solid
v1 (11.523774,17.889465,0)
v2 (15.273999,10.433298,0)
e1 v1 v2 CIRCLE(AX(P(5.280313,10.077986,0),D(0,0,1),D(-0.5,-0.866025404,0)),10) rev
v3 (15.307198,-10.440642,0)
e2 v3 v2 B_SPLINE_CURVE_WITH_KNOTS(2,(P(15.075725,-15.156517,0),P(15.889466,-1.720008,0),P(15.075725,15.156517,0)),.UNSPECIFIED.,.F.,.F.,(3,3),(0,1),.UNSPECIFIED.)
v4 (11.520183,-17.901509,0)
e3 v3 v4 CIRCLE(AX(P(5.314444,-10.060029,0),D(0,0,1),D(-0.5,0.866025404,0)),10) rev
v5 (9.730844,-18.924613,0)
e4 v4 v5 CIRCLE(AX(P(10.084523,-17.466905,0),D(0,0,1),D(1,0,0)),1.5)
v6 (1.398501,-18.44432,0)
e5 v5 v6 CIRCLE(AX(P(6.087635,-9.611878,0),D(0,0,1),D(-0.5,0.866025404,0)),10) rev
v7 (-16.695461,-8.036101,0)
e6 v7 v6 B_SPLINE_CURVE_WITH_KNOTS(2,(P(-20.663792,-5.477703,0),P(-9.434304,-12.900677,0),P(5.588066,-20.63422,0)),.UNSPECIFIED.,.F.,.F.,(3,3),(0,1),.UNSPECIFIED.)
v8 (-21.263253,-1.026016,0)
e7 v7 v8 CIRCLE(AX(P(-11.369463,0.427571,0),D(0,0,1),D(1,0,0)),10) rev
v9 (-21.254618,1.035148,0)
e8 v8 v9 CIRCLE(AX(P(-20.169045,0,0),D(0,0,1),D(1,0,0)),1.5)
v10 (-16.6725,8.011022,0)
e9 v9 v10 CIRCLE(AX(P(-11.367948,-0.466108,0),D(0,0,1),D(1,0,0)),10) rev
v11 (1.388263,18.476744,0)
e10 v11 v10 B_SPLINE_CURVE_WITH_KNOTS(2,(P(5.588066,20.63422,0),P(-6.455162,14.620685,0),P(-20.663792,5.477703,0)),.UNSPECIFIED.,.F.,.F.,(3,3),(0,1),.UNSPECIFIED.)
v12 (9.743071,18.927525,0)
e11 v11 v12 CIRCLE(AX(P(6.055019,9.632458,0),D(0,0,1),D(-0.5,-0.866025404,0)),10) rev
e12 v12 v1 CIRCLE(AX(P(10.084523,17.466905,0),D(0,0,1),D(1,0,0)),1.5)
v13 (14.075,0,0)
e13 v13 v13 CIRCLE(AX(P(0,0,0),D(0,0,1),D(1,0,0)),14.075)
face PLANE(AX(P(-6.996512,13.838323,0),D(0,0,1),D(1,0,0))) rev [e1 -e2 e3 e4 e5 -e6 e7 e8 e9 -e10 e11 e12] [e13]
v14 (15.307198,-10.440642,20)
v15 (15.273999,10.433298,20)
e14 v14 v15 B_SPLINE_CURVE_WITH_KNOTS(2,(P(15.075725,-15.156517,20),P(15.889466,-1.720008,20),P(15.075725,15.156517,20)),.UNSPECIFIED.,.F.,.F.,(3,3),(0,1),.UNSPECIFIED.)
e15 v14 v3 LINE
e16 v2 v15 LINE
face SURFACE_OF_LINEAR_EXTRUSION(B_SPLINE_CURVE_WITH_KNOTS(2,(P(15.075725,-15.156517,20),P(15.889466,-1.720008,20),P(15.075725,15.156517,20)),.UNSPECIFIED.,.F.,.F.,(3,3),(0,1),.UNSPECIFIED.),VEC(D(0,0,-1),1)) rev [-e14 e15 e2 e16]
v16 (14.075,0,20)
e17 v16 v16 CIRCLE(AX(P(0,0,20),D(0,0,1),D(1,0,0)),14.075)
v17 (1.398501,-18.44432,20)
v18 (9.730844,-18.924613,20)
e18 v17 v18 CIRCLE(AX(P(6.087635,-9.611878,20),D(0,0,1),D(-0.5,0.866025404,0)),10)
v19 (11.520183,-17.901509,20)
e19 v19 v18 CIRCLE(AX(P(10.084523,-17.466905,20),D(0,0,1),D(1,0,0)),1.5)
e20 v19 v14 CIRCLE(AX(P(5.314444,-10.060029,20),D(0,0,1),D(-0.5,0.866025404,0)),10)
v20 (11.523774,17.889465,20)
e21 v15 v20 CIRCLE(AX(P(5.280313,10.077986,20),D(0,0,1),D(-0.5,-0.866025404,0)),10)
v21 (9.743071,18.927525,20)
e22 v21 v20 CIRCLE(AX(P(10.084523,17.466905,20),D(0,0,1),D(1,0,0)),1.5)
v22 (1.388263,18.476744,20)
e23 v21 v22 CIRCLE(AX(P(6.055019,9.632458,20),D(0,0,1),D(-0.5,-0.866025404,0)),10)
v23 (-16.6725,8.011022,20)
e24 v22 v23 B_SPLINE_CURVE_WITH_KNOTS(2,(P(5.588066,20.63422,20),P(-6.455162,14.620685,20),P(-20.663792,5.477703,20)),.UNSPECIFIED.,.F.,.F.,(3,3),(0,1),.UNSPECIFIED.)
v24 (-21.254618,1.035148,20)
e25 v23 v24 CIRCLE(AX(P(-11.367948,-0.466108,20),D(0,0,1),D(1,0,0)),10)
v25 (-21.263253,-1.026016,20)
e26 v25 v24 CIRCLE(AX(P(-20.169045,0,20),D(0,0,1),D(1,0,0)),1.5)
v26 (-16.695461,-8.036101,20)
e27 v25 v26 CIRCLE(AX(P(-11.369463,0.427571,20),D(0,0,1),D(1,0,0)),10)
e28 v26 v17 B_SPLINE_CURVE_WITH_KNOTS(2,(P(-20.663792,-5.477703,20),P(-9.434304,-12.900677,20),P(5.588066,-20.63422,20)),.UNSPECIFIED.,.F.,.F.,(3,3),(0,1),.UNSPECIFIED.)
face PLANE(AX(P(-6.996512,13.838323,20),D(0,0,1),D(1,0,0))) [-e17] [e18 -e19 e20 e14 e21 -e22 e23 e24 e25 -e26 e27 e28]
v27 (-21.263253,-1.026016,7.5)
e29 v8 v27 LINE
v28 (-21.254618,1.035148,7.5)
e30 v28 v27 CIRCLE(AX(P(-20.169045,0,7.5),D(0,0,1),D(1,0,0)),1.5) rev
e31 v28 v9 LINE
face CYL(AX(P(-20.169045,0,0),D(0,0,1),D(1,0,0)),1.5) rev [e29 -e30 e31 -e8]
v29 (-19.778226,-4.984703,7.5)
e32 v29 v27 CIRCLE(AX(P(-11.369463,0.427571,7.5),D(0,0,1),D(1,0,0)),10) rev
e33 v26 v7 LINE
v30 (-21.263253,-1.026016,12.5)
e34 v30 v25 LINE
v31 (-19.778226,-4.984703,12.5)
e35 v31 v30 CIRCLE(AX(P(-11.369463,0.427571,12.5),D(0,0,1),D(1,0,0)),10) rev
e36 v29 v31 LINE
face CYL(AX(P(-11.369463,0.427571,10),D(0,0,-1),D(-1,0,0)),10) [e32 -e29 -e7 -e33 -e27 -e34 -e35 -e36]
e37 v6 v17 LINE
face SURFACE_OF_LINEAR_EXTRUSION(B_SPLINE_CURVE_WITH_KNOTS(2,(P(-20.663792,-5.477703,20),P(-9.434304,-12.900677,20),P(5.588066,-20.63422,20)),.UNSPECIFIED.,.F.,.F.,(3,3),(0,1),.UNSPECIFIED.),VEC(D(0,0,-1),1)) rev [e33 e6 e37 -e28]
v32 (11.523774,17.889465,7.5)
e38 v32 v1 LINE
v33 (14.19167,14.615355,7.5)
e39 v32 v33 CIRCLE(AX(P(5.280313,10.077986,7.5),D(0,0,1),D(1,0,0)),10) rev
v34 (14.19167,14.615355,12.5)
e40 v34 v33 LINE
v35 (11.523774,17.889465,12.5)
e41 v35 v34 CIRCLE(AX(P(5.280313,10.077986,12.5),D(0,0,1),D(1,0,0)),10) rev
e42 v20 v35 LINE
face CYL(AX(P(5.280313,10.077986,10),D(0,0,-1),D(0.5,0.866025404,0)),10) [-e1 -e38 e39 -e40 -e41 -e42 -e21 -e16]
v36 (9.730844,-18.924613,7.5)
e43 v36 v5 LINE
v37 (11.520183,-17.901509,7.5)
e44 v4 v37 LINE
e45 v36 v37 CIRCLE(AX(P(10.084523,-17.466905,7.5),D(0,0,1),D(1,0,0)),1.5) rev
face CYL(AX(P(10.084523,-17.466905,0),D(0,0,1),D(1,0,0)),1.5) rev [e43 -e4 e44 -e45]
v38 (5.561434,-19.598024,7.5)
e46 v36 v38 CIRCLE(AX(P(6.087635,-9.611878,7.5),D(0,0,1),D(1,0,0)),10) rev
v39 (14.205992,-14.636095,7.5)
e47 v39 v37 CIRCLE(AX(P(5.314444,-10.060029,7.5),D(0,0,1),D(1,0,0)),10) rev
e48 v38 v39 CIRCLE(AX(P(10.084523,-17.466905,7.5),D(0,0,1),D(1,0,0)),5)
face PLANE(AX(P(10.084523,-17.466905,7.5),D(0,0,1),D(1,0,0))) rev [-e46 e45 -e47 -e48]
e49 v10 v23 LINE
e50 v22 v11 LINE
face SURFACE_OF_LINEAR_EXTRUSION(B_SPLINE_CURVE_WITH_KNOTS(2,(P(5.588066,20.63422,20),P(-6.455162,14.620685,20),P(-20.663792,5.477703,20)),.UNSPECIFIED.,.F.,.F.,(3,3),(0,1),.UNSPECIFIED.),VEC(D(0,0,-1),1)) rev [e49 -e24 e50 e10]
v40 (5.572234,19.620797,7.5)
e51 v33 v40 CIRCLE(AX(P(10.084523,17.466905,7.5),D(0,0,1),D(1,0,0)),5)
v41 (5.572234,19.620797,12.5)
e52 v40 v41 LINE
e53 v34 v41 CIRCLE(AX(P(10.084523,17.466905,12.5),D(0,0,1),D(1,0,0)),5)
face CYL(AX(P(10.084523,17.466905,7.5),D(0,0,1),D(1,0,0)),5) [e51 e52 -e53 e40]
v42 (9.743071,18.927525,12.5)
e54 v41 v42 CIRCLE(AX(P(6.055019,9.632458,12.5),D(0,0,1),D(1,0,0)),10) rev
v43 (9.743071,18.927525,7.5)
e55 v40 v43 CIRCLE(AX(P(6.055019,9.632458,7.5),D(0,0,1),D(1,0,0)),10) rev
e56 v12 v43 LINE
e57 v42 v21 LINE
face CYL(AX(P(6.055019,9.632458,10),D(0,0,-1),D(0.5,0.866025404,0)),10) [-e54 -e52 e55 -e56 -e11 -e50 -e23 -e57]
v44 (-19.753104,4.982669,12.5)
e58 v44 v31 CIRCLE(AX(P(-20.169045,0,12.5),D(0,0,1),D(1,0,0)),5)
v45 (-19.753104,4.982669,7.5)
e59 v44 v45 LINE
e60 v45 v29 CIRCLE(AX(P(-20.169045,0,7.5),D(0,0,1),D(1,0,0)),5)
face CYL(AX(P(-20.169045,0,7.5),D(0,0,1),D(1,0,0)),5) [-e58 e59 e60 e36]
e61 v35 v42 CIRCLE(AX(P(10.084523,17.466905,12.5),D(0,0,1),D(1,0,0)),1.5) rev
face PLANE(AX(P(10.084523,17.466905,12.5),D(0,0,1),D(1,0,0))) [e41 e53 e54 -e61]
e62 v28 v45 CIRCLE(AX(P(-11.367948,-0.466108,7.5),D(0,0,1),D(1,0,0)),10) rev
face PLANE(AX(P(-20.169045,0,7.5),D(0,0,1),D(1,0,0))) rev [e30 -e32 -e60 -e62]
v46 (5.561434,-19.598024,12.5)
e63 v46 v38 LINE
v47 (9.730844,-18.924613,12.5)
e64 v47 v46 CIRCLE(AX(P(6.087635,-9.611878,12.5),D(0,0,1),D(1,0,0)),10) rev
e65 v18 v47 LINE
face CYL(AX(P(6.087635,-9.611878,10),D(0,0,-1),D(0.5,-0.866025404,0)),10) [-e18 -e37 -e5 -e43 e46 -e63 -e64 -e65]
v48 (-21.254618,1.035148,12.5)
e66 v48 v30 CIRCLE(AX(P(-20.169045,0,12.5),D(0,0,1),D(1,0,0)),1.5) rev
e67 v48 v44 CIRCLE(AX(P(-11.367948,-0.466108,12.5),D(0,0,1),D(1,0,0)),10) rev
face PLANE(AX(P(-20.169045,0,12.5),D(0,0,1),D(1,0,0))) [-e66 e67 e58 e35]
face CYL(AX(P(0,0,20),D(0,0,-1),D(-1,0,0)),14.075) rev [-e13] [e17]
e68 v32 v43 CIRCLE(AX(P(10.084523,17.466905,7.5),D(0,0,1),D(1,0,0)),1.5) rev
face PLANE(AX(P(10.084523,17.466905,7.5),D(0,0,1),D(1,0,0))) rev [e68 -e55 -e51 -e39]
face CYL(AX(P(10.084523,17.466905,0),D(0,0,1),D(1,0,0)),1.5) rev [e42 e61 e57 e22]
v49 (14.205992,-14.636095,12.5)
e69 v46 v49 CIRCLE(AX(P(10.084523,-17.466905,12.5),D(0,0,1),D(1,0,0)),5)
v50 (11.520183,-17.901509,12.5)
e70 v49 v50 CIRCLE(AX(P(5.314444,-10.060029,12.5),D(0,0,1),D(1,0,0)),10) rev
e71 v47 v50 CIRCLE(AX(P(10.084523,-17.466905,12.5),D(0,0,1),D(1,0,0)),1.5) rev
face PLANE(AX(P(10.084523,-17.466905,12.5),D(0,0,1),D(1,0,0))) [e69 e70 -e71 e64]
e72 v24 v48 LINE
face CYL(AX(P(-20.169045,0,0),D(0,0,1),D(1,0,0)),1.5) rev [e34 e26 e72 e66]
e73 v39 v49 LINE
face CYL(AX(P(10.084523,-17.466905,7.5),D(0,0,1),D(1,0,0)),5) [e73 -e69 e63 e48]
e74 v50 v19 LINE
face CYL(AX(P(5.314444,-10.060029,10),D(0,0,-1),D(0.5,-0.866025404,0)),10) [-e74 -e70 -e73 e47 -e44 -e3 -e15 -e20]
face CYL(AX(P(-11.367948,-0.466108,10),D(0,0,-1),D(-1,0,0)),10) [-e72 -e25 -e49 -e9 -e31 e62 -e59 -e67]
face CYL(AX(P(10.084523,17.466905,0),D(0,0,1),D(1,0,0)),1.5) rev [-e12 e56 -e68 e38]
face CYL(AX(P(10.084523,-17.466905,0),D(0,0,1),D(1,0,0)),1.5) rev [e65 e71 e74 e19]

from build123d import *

# Parameters (mm, degrees)
SKETCH1_R               = 14.075
BOSS_EXTRUDE1_DEPTH     = 20
FILLET2_R               = 10
CIRPATTERN2_DEPTH       = 20
CUT_EXTRUDE1_DEPTH      = 36.236736823
CUT_EXTRUDE1_DEPTH_BACK = 36.236736823
SKETCH2_R               = 1.5
SKETCH3_R               = 5
BOSS_EXTRUDE2_DEPTH     = 2.5


# Read off the part's stored shape, not the designer's step: CirPattern2
with BuildPart() as part:
    # Sketch1 → Boss-Extrude1 (new body)
    with BuildSketch(Plane.XY):
        with BuildLine():
            ThreePointArc((15.07572539, 15.156517087), (10.68875, 18.513458069), (5.588066136, 20.634219712))
            add(Edge.make_bspline(
                [(-20.663791525, 5.477702624), (-6.455161962, 14.620684981), (5.588066136, 20.634219712)],
                knots=[0, 0, 0, 1, 1, 1], degree=2))
            ThreePointArc((-20.663791525, 5.477702624), (-21.3775, 0), (-20.663791525, -5.477702624))
            add(Edge.make_bspline(
                [(5.588066136, -20.634219712), (-9.434303633, -12.900676735), (-20.663791525, -5.477702624)],
                knots=[0, 0, 0, 1, 1, 1], degree=2))
            ThreePointArc((5.588066136, -20.634219712), (10.68875, -18.513458069), (15.07572539, -15.156517087))
            add(Edge.make_bspline(
                [(15.07572539, 15.156517087), (15.889465595, -1.720008246), (15.07572539, -15.156517087)],
                knots=[0, 0, 0, 1, 1, 1], degree=2))
        make_face()
        Circle(SKETCH1_R, mode=Mode.SUBTRACT)
    extrude(amount=BOSS_EXTRUDE1_DEPTH)

    # Fillet2
    # the kernel refuses this fillet: 10 mm, written as the material it takes off along each edge
    with BuildSketch(Plane(origin=(-20.663791525, 5.477702624, 0), x_dir=(0.8442926206452175, 0.535882422480931, 0), z_dir=(0, 0, 1))) as fillet2_piece_1:
        with BuildLine():
            CenterArc((4.663228268, -9.99979423), FILLET2_R, 89.632438943, 60.311708344)
            Line((-3.992147587, -4.991354472), (-4.165255104, -4.891185677))
            ThreePointArc((-4.165255104, -4.891185677), (-2.339855889, -2.220716027), (-0.135758458, 0.146866065))
            Line((-0.135758458, 0.146866065), (-0.001245228, 0.199996123))
            ThreePointArc((-0.001245228, 0.199996123), (2.363679869, 0.207468059), (4.728662356, 0.199995885))
            Line((4.728662356, 0.199995885), (4.727379335, 0))
        make_face()
    extrude(amount=20, mode=Mode.SUBTRACT)
    with BuildSketch(Plane(origin=(-20.663791525, -5.477702624, 0), x_dir=(-0.11054249856240242, 0.9938713981253215, 0), z_dir=(0, 0, 1))) as fillet2_piece_2:
        with BuildLine():
            CenterArc((4.841664479, -9.890151004), FILLET2_R, 81.49970425, 59.972427812)
            Line((-2.981388332, -3.661198868), (-3.137849388, -3.536619825))
            ThreePointArc((-3.137849388, -3.536619825), (-1.656048683, -1.695980181), (-0.153629227, 0.128054913))
            Line((-0.153629227, 0.128054913), (-0.029562903, 0.19780302))
            ThreePointArc((-0.029562903, 0.19780302), (3.159904821, 0.434829692), (6.349372545, 0.19780302))
            Line((6.349372545, 0.19780302), (6.319809642, 0))
        make_face()
    extrude(amount=20, mode=Mode.SUBTRACT)

    # CirPattern2 outline → CirPattern2 (cut)
    with BuildSketch(Plane.XY):
        with BuildLine():
            add(Edge.make_bspline(
                [(5.588066136, 20.634219712), (3.520088132, 19.601618033), (1.388262549, 18.476743556)],
                knots=[0, 0, 0, 0.171712932, 0.171712932, 0.171712932], degree=2))
            ThreePointArc((1.388262549, 18.476743556), (6.013402902, 19.632371585), (10.648001522, 18.515279353))
            ThreePointArc((10.648001522, 18.515279353), (13.959170177, 15.045625026), (15.27399868, 10.43329752))
            add(Edge.make_bspline(
                [(15.27399868, 10.43329752), (15.191267831, 12.760230261), (15.07572539, 15.156517087)],
                knots=[0.858010652, 0.858010652, 0.858010652, 1, 1, 1], degree=2))
            ThreePointArc((15.07572539, 15.156517087), (10.68875, 18.513458069), (5.588066136, 20.634219712))
        make_face()
        with BuildLine():
            add(Edge.make_bspline(
                [(15.07572539, -15.156517087), (15.215455106, -12.849294762), (15.307198024, -10.440642412)],
                knots=[0, 0, 0, 0.171712932, 0.171712932, 0.171712932], degree=2))
            ThreePointArc((15.307198024, -10.440642412), (13.995431078, -15.023945468), (10.710701517, -18.479079494))
            ThreePointArc((10.710701517, -18.479079494), (6.0503084, -19.611808503), (1.398501358, -18.444319635))
            add(Edge.make_bspline(
                [(1.398501358, -18.444319635), (3.455049649, -19.536138988), (5.588066136, -20.634219712)],
                knots=[0.858010652, 0.858010652, 0.858010652, 1, 1, 1], degree=2))
            ThreePointArc((5.588066136, -20.634219712), (10.68875, -18.513458069), (15.07572539, -15.156517087))
        make_face()
    extrude(amount=CIRPATTERN2_DEPTH, mode=Mode.SUBTRACT)

    # Sketch2 → Cut-Extrude1 (cut, two sides: drawn at the far end of the back side and taken through both)
    with BuildSketch(Plane.XY.offset(20).offset(-CUT_EXTRUDE1_DEPTH_BACK)):
        with Locations((10.084522584, -17.466905485)):
            Circle(SKETCH2_R)
        with Locations((10.084522584, 17.466905485)):
            Circle(SKETCH2_R)
        with Locations((-20.169045167, 0)):
            Circle(SKETCH2_R)
    extrude(amount=CUT_EXTRUDE1_DEPTH + CUT_EXTRUDE1_DEPTH_BACK, mode=Mode.SUBTRACT)

    # Sketch3 → Boss-Extrude2 (add, symmetric)
    with BuildSketch(Plane.XY.offset(10)):
        with Locations((-20.169045167, 0)):
            Circle(SKETCH3_R)
        with Locations((10.084522584, 17.466905485)):
            Circle(SKETCH3_R)
        with Locations((10.084522584, -17.466905485)):
            Circle(SKETCH3_R)
    extrude(amount=BOSS_EXTRUDE2_DEPTH, both=True)


solid = part.part
